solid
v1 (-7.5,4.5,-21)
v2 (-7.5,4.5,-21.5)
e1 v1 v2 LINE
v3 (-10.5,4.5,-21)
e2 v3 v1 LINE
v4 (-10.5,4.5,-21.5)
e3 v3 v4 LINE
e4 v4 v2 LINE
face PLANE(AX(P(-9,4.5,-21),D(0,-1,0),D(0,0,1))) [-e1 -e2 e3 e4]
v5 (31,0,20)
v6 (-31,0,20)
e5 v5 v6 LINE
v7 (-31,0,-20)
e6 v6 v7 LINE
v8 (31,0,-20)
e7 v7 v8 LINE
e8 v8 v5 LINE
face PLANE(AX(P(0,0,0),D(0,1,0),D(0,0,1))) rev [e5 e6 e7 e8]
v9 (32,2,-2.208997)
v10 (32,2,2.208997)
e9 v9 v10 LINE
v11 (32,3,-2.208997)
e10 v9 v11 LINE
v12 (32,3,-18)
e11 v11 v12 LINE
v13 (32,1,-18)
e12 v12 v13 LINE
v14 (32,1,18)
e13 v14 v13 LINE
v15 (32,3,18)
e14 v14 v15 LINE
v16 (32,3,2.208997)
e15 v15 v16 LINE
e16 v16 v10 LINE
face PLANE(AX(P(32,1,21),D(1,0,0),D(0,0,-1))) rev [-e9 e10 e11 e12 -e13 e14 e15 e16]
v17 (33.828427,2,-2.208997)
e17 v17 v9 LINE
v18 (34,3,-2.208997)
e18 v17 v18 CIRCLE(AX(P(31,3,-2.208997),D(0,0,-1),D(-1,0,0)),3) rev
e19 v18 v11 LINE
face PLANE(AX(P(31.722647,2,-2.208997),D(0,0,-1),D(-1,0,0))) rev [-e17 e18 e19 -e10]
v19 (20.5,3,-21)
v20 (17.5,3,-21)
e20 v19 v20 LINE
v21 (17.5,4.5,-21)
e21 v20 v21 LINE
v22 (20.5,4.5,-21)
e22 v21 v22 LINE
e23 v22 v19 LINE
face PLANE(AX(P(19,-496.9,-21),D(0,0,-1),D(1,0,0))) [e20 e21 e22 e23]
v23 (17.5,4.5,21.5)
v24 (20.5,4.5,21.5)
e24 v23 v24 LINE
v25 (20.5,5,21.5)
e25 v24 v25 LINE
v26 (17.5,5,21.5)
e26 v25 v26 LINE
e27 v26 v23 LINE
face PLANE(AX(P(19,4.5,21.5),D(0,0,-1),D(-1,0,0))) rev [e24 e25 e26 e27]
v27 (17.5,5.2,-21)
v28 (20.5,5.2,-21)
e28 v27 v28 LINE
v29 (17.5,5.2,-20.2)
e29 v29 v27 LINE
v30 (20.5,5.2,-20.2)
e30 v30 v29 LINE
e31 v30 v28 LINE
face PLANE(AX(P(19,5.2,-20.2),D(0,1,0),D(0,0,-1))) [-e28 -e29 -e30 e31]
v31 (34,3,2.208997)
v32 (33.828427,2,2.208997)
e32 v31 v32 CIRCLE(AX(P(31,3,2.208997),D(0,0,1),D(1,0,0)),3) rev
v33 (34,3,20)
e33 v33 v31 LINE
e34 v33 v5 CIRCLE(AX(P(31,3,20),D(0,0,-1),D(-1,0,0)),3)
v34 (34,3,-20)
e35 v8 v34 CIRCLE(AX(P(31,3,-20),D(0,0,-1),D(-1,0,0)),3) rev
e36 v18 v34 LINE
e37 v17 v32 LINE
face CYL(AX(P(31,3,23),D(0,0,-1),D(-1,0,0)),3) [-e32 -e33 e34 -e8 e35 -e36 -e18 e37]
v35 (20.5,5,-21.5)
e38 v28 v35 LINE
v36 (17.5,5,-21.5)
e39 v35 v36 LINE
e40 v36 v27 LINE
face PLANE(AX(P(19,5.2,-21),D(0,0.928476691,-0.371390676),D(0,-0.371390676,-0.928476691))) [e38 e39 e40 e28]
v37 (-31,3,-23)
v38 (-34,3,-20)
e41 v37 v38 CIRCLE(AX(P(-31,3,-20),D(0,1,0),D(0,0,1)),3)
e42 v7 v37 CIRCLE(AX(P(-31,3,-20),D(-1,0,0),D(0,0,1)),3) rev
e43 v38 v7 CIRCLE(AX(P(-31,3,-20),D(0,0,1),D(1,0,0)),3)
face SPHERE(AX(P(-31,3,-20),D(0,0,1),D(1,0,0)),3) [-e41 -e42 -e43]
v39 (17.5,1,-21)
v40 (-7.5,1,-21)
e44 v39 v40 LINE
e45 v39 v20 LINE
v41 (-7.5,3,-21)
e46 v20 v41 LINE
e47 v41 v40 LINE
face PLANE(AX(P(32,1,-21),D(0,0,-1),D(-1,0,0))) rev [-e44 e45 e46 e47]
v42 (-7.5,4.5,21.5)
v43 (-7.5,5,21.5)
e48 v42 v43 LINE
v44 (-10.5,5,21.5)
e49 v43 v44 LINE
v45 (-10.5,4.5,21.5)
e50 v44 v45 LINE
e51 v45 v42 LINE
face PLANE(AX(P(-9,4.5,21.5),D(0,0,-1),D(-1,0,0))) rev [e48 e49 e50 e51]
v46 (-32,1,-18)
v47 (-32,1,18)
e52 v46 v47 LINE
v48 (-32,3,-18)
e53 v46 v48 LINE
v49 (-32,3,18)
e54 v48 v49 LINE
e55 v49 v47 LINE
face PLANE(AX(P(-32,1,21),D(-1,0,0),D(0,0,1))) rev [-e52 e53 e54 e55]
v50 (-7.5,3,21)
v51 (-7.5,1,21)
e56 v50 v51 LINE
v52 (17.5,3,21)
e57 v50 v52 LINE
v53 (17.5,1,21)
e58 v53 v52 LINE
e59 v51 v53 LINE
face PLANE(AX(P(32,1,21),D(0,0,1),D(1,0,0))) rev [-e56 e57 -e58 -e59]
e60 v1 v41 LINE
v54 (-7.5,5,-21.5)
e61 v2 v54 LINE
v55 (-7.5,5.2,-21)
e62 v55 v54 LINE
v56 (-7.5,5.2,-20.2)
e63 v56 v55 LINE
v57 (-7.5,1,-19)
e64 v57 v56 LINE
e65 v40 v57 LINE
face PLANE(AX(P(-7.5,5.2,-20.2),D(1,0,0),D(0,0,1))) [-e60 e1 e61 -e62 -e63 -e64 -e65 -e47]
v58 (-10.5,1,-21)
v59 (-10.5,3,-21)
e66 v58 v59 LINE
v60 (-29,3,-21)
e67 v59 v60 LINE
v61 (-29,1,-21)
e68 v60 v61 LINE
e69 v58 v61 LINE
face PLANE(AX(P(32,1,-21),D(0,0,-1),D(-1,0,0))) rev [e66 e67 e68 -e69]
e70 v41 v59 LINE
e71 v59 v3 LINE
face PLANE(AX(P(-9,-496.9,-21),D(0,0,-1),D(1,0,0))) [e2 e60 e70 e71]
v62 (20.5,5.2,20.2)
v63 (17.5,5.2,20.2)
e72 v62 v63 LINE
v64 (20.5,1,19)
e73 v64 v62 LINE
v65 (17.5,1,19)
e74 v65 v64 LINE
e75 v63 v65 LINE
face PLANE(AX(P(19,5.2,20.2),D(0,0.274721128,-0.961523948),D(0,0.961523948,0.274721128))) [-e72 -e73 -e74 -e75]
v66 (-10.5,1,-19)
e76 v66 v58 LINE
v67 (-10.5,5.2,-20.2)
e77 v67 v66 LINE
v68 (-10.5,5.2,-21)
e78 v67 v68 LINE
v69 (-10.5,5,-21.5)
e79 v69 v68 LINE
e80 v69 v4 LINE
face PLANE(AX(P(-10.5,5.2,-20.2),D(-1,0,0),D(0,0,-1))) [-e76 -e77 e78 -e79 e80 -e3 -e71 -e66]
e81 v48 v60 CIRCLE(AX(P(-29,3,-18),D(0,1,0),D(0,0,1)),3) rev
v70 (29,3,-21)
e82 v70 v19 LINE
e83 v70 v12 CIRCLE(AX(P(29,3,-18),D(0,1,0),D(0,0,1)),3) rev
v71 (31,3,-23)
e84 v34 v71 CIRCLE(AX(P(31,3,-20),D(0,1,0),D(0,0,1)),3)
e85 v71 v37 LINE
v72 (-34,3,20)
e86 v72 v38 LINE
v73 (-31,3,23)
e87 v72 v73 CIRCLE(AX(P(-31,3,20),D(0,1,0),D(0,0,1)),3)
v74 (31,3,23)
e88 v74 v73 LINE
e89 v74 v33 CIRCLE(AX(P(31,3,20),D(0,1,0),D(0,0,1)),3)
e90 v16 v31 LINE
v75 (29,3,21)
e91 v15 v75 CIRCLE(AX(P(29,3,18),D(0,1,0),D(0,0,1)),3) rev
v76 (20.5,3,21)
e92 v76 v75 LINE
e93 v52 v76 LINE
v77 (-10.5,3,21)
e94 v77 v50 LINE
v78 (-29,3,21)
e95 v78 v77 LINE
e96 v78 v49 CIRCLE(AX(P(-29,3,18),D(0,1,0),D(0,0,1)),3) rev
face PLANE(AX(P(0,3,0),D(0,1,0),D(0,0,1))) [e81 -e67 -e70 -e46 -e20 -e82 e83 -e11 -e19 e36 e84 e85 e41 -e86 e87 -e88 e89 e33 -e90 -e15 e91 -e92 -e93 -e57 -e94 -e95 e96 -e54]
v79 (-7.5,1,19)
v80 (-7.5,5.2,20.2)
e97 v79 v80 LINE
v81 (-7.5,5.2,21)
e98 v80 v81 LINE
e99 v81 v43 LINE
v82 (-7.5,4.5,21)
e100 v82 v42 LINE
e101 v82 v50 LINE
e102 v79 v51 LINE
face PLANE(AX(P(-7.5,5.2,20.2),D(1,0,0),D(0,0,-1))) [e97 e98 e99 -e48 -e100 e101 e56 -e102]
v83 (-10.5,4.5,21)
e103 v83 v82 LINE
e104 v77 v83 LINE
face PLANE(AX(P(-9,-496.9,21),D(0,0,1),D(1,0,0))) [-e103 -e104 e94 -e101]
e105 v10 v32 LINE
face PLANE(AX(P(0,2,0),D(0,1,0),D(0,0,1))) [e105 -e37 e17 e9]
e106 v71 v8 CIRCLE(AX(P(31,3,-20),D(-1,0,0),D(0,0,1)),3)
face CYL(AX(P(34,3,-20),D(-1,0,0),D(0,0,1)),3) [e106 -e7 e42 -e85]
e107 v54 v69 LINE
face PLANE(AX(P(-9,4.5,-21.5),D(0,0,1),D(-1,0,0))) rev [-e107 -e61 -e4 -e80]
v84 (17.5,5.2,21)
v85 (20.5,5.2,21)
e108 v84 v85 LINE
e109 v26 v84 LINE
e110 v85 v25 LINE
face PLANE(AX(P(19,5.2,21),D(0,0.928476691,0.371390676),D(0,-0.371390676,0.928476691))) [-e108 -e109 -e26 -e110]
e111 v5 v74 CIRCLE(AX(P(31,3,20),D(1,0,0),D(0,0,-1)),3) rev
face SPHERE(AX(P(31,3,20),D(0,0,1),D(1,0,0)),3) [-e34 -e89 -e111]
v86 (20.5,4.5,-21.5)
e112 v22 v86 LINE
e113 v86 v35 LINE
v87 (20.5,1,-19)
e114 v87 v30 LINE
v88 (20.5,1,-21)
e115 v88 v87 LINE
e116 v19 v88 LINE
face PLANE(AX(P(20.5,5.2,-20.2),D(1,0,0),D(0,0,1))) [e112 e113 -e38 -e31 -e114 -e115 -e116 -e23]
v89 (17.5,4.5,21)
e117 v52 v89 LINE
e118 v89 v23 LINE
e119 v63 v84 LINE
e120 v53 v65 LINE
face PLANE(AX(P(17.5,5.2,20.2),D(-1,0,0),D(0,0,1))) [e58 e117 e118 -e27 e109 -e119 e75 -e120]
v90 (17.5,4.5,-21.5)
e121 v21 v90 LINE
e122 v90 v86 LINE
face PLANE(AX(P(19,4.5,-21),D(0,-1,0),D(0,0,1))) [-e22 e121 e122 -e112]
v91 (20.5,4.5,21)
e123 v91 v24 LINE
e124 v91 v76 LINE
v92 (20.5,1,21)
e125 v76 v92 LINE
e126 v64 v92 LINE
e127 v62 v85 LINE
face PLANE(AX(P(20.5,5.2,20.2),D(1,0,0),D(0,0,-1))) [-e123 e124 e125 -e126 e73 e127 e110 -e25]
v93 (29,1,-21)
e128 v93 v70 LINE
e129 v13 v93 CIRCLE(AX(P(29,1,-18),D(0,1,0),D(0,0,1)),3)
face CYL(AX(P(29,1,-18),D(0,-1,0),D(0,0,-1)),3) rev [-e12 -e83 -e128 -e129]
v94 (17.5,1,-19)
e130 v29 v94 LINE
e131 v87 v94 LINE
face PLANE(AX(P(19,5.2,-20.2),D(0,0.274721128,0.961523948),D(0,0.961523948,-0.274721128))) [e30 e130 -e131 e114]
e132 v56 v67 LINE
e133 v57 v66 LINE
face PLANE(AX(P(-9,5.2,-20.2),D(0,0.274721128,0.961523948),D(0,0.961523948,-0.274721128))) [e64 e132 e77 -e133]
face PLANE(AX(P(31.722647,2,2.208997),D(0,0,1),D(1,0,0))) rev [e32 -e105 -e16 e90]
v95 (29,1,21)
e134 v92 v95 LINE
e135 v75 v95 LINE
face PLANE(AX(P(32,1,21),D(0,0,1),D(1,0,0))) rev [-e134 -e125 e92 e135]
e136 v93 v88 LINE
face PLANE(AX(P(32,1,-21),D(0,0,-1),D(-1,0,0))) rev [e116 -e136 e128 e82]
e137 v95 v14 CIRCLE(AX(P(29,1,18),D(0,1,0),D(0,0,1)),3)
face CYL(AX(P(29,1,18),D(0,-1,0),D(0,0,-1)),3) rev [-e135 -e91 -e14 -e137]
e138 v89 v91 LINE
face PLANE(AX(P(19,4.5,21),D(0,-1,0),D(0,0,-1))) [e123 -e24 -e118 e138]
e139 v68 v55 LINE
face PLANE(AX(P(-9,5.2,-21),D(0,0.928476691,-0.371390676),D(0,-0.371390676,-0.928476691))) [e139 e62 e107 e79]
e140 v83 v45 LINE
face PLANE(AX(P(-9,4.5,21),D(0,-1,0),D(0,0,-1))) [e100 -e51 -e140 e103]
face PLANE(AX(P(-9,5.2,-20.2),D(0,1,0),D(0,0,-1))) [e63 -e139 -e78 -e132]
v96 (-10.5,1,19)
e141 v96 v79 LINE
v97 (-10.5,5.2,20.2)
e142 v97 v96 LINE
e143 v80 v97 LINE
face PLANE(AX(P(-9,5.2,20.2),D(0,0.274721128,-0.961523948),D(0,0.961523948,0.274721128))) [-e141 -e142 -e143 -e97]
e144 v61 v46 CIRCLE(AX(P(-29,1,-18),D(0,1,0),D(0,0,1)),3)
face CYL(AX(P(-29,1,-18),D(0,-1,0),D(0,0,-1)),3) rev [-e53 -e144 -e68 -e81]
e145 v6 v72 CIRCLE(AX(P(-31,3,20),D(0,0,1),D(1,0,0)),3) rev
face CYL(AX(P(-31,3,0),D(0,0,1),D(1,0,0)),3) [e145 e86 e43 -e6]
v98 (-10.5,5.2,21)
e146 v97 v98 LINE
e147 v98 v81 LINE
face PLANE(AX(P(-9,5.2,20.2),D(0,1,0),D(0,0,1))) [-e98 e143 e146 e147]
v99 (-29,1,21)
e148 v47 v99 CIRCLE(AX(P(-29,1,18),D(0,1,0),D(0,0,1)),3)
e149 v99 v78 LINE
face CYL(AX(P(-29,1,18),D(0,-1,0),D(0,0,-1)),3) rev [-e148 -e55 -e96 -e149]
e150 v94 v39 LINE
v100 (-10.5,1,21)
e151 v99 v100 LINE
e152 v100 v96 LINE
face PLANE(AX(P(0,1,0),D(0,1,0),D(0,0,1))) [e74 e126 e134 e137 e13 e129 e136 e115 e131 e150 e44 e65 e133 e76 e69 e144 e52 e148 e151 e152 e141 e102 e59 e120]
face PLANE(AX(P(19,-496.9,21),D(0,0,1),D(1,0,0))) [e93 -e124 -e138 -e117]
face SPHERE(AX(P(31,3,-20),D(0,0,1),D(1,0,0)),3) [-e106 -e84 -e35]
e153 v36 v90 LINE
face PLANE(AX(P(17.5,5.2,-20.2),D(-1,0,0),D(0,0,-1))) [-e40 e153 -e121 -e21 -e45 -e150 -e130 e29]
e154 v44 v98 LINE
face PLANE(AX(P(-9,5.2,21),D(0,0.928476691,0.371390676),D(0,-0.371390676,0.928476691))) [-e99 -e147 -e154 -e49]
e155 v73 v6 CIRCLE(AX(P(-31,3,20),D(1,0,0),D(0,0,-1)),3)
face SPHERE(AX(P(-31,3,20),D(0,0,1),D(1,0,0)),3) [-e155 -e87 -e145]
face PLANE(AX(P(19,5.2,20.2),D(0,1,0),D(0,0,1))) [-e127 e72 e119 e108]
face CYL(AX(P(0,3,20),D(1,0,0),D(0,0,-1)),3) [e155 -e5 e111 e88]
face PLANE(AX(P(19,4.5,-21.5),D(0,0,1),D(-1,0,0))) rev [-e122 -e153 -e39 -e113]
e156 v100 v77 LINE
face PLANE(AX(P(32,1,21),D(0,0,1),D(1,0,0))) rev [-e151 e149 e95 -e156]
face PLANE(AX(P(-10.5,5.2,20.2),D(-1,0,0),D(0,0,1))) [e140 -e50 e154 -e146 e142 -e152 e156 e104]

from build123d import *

# Parameters (mm, degrees)
SKETCH1_W           = 68
SKETCH1_H           = 46
BOSS_EXTRUDE1_DEPTH = 3
SKETCH2_W           = 64
SKETCH2_H           = 42
CUT_EXTRUDE1_DEPTH  = 2
SNAP_START          = 17.5
SNAP_HOOK1_DEPTH    = 3
SNAP_START_2        = -10.5
SNAP_HOOK2_DEPTH    = 3
FILLET3_R           = 3
FILLET4_R           = 3
FILLET5_R           = 3
SKETCH4_W           = 2.752193097
SKETCH4_H           = 4.417994182
CUT_EXTRUDE2_DEPTH  = 1


# Read off the part's stored shape, not the designer's step: Snap Hook1, Snap Hook2
# Some blends are built 0.0001 mm under size
with BuildPart() as part:
    # Sketch1 → Boss-Extrude1 (new body)
    with BuildSketch(Plane(origin=(0, 0, 0), x_dir=(1, 0, 0), z_dir=(0, 1, 0))):
        Rectangle(SKETCH1_W, SKETCH1_H)
    extrude(amount=BOSS_EXTRUDE1_DEPTH)

    # Sketch2 → Cut-Extrude1 (cut)
    with BuildSketch(Plane(origin=(0, 3, 0), x_dir=(1, 0, 0), z_dir=(0, 1, 0))):
        Rectangle(SKETCH2_W, SKETCH2_H)
    extrude(amount=-CUT_EXTRUDE1_DEPTH, mode=Mode.SUBTRACT)

    # Snap Hook1 outline → Snap Hook1 (add)
    with BuildSketch(Plane.YZ.offset(SNAP_START)):
        Polygon((5, -21.5), (5.2, -21), (5.2, -20.2), (1, -19), (1, -21), (4.5, -21), (4.5, -21.5), align=None)
    snap_hook1 = extrude(amount=SNAP_HOOK1_DEPTH)

    # Snap Hook2 outline → Snap Hook2 (add)
    with BuildSketch(Plane.YZ.offset(SNAP_START_2)):
        Polygon((5, -21.5), (5.2, -21), (5.2, -20.2), (1, -19), (1, -21), (4.5, -21), (4.5, -21.5), align=None)
    snap_hook2 = extrude(amount=SNAP_HOOK2_DEPTH)

    # Mirror1: Snap Hook1, Snap Hook2 across plane
    add(snap_hook1.mirror(Plane.XY))
    add(snap_hook2.mirror(Plane.XY))

    # Fillet3
    fillet3_edges = [part.edges().sort_by_distance(p)[0] for p in [
        (0, 0, -23),
        (34, 0, 0),
        (0, 0, 23),
        (-34, 0, 0),
    ]]
    fillet(fillet3_edges, radius=FILLET3_R - 0.0001)  # a hair under: the kernel refuses the full size

    # Fillet4
    # the kernel refuses this fillet: 3 mm, written as the material it takes off along each edge
    with BuildSketch(Plane(origin=(31, 0, 20), x_dir=(1, 0, 0), z_dir=(0, 0, -1))) as fillet4_piece_1:
        with BuildLine():
            CenterArc((0.0001, -2.9999), 2.9999, 0, 90)
            Line((3, -2.9999), (3, 0))
            Line((3, 0), (0.0001, 0))
        make_face()
    revolve(axis=Axis((31, 0, 20), (0, -1, 0)), revolution_arc=90, mode=Mode.SUBTRACT)
    with BuildSketch(Plane(origin=(-31, 0, 20), x_dir=(0, 0, 1), z_dir=(1, 0, 0))) as fillet4_piece_2:
        with BuildLine():
            CenterArc((0.0001, -2.9999), 2.9999, 0, 90)
            Line((3, -2.9999), (3, 0))
            Line((3, 0), (0.0001, 0))
        make_face()
    revolve(axis=Axis((-31, 0, 20), (0, -1, 0)), revolution_arc=90, mode=Mode.SUBTRACT)
    with BuildSketch(Plane(origin=(31, 0, -20), x_dir=(0, 0, -1), z_dir=(-1, 0, 0))) as fillet4_piece_3:
        with BuildLine():
            CenterArc((0.0001, -2.9999), 2.9999, 0, 90)
            Line((3, -2.9999), (3, 0))
            Line((3, 0), (0.0001, 0))
        make_face()
    revolve(axis=Axis((31, 0, -20), (0, -1, 0)), revolution_arc=90, mode=Mode.SUBTRACT)
    with BuildSketch(Plane(origin=(-31, 0, -20), x_dir=(-1, 0, 0), z_dir=(0, 0, 1))) as fillet4_piece_4:
        with BuildLine():
            CenterArc((0.0001, -2.9999), 2.9999, 0, 90)
            Line((3, -2.9999), (3, 0))
            Line((3, 0), (0.0001, 0))
        make_face()
    revolve(axis=Axis((-31, 0, -20), (0, -1, 0)), revolution_arc=90, mode=Mode.SUBTRACT)
    with BuildSketch(Plane(origin=(-34, 0, -23), x_dir=(0, 0, 1), z_dir=(0, 1, 0)), Plane(origin=(-34, 0, 23), x_dir=(1, 0, 0), z_dir=(0, 1, 0))) as fillet4_piece_5:
        with BuildLine():
            CenterArc((FILLET4_R, FILLET4_R), FILLET4_R, 180, 90)
            Line((0, FILLET4_R), (0, 0))
            Line((0, 0), (FILLET4_R, 0))
        make_face()
    extrude(amount=10.5, mode=Mode.SUBTRACT)
    with BuildSketch(Plane(origin=(34, 0, -23), x_dir=(0, 0, 1), z_dir=(0, 1, 0)), Plane(origin=(34, 0, 23), x_dir=(-1, 0, 0), z_dir=(0, 1, 0))) as fillet4_piece_6:
        with BuildLine():
            CenterArc((FILLET4_R, -FILLET4_R), FILLET4_R, 90, 90)
            Line((0, -FILLET4_R), (0, 0))
            Line((0, 0), (FILLET4_R, 0))
        make_face()
    extrude(amount=10.5, mode=Mode.SUBTRACT)

    # Fillet5
    fillet5_edges = [part.edges().sort_by_distance(p)[0] for p in [
        (-32, 2, 21),
        (-32, 2, -21),
        (32, 2, -21),
        (32, 2, 21),
    ]]
    fillet(fillet5_edges, radius=FILLET5_R)

    # Sketch4 → Cut-Extrude2 (cut)
    with BuildSketch(Plane(origin=(0, 3, 0), x_dir=(1, 0, 0), z_dir=(0, 1, 0))):
        with Locations((33.0987433, 0)):
            Rectangle(SKETCH4_W, SKETCH4_H)
    extrude(amount=-CUT_EXTRUDE2_DEPTH, mode=Mode.SUBTRACT)


solid = part.part
